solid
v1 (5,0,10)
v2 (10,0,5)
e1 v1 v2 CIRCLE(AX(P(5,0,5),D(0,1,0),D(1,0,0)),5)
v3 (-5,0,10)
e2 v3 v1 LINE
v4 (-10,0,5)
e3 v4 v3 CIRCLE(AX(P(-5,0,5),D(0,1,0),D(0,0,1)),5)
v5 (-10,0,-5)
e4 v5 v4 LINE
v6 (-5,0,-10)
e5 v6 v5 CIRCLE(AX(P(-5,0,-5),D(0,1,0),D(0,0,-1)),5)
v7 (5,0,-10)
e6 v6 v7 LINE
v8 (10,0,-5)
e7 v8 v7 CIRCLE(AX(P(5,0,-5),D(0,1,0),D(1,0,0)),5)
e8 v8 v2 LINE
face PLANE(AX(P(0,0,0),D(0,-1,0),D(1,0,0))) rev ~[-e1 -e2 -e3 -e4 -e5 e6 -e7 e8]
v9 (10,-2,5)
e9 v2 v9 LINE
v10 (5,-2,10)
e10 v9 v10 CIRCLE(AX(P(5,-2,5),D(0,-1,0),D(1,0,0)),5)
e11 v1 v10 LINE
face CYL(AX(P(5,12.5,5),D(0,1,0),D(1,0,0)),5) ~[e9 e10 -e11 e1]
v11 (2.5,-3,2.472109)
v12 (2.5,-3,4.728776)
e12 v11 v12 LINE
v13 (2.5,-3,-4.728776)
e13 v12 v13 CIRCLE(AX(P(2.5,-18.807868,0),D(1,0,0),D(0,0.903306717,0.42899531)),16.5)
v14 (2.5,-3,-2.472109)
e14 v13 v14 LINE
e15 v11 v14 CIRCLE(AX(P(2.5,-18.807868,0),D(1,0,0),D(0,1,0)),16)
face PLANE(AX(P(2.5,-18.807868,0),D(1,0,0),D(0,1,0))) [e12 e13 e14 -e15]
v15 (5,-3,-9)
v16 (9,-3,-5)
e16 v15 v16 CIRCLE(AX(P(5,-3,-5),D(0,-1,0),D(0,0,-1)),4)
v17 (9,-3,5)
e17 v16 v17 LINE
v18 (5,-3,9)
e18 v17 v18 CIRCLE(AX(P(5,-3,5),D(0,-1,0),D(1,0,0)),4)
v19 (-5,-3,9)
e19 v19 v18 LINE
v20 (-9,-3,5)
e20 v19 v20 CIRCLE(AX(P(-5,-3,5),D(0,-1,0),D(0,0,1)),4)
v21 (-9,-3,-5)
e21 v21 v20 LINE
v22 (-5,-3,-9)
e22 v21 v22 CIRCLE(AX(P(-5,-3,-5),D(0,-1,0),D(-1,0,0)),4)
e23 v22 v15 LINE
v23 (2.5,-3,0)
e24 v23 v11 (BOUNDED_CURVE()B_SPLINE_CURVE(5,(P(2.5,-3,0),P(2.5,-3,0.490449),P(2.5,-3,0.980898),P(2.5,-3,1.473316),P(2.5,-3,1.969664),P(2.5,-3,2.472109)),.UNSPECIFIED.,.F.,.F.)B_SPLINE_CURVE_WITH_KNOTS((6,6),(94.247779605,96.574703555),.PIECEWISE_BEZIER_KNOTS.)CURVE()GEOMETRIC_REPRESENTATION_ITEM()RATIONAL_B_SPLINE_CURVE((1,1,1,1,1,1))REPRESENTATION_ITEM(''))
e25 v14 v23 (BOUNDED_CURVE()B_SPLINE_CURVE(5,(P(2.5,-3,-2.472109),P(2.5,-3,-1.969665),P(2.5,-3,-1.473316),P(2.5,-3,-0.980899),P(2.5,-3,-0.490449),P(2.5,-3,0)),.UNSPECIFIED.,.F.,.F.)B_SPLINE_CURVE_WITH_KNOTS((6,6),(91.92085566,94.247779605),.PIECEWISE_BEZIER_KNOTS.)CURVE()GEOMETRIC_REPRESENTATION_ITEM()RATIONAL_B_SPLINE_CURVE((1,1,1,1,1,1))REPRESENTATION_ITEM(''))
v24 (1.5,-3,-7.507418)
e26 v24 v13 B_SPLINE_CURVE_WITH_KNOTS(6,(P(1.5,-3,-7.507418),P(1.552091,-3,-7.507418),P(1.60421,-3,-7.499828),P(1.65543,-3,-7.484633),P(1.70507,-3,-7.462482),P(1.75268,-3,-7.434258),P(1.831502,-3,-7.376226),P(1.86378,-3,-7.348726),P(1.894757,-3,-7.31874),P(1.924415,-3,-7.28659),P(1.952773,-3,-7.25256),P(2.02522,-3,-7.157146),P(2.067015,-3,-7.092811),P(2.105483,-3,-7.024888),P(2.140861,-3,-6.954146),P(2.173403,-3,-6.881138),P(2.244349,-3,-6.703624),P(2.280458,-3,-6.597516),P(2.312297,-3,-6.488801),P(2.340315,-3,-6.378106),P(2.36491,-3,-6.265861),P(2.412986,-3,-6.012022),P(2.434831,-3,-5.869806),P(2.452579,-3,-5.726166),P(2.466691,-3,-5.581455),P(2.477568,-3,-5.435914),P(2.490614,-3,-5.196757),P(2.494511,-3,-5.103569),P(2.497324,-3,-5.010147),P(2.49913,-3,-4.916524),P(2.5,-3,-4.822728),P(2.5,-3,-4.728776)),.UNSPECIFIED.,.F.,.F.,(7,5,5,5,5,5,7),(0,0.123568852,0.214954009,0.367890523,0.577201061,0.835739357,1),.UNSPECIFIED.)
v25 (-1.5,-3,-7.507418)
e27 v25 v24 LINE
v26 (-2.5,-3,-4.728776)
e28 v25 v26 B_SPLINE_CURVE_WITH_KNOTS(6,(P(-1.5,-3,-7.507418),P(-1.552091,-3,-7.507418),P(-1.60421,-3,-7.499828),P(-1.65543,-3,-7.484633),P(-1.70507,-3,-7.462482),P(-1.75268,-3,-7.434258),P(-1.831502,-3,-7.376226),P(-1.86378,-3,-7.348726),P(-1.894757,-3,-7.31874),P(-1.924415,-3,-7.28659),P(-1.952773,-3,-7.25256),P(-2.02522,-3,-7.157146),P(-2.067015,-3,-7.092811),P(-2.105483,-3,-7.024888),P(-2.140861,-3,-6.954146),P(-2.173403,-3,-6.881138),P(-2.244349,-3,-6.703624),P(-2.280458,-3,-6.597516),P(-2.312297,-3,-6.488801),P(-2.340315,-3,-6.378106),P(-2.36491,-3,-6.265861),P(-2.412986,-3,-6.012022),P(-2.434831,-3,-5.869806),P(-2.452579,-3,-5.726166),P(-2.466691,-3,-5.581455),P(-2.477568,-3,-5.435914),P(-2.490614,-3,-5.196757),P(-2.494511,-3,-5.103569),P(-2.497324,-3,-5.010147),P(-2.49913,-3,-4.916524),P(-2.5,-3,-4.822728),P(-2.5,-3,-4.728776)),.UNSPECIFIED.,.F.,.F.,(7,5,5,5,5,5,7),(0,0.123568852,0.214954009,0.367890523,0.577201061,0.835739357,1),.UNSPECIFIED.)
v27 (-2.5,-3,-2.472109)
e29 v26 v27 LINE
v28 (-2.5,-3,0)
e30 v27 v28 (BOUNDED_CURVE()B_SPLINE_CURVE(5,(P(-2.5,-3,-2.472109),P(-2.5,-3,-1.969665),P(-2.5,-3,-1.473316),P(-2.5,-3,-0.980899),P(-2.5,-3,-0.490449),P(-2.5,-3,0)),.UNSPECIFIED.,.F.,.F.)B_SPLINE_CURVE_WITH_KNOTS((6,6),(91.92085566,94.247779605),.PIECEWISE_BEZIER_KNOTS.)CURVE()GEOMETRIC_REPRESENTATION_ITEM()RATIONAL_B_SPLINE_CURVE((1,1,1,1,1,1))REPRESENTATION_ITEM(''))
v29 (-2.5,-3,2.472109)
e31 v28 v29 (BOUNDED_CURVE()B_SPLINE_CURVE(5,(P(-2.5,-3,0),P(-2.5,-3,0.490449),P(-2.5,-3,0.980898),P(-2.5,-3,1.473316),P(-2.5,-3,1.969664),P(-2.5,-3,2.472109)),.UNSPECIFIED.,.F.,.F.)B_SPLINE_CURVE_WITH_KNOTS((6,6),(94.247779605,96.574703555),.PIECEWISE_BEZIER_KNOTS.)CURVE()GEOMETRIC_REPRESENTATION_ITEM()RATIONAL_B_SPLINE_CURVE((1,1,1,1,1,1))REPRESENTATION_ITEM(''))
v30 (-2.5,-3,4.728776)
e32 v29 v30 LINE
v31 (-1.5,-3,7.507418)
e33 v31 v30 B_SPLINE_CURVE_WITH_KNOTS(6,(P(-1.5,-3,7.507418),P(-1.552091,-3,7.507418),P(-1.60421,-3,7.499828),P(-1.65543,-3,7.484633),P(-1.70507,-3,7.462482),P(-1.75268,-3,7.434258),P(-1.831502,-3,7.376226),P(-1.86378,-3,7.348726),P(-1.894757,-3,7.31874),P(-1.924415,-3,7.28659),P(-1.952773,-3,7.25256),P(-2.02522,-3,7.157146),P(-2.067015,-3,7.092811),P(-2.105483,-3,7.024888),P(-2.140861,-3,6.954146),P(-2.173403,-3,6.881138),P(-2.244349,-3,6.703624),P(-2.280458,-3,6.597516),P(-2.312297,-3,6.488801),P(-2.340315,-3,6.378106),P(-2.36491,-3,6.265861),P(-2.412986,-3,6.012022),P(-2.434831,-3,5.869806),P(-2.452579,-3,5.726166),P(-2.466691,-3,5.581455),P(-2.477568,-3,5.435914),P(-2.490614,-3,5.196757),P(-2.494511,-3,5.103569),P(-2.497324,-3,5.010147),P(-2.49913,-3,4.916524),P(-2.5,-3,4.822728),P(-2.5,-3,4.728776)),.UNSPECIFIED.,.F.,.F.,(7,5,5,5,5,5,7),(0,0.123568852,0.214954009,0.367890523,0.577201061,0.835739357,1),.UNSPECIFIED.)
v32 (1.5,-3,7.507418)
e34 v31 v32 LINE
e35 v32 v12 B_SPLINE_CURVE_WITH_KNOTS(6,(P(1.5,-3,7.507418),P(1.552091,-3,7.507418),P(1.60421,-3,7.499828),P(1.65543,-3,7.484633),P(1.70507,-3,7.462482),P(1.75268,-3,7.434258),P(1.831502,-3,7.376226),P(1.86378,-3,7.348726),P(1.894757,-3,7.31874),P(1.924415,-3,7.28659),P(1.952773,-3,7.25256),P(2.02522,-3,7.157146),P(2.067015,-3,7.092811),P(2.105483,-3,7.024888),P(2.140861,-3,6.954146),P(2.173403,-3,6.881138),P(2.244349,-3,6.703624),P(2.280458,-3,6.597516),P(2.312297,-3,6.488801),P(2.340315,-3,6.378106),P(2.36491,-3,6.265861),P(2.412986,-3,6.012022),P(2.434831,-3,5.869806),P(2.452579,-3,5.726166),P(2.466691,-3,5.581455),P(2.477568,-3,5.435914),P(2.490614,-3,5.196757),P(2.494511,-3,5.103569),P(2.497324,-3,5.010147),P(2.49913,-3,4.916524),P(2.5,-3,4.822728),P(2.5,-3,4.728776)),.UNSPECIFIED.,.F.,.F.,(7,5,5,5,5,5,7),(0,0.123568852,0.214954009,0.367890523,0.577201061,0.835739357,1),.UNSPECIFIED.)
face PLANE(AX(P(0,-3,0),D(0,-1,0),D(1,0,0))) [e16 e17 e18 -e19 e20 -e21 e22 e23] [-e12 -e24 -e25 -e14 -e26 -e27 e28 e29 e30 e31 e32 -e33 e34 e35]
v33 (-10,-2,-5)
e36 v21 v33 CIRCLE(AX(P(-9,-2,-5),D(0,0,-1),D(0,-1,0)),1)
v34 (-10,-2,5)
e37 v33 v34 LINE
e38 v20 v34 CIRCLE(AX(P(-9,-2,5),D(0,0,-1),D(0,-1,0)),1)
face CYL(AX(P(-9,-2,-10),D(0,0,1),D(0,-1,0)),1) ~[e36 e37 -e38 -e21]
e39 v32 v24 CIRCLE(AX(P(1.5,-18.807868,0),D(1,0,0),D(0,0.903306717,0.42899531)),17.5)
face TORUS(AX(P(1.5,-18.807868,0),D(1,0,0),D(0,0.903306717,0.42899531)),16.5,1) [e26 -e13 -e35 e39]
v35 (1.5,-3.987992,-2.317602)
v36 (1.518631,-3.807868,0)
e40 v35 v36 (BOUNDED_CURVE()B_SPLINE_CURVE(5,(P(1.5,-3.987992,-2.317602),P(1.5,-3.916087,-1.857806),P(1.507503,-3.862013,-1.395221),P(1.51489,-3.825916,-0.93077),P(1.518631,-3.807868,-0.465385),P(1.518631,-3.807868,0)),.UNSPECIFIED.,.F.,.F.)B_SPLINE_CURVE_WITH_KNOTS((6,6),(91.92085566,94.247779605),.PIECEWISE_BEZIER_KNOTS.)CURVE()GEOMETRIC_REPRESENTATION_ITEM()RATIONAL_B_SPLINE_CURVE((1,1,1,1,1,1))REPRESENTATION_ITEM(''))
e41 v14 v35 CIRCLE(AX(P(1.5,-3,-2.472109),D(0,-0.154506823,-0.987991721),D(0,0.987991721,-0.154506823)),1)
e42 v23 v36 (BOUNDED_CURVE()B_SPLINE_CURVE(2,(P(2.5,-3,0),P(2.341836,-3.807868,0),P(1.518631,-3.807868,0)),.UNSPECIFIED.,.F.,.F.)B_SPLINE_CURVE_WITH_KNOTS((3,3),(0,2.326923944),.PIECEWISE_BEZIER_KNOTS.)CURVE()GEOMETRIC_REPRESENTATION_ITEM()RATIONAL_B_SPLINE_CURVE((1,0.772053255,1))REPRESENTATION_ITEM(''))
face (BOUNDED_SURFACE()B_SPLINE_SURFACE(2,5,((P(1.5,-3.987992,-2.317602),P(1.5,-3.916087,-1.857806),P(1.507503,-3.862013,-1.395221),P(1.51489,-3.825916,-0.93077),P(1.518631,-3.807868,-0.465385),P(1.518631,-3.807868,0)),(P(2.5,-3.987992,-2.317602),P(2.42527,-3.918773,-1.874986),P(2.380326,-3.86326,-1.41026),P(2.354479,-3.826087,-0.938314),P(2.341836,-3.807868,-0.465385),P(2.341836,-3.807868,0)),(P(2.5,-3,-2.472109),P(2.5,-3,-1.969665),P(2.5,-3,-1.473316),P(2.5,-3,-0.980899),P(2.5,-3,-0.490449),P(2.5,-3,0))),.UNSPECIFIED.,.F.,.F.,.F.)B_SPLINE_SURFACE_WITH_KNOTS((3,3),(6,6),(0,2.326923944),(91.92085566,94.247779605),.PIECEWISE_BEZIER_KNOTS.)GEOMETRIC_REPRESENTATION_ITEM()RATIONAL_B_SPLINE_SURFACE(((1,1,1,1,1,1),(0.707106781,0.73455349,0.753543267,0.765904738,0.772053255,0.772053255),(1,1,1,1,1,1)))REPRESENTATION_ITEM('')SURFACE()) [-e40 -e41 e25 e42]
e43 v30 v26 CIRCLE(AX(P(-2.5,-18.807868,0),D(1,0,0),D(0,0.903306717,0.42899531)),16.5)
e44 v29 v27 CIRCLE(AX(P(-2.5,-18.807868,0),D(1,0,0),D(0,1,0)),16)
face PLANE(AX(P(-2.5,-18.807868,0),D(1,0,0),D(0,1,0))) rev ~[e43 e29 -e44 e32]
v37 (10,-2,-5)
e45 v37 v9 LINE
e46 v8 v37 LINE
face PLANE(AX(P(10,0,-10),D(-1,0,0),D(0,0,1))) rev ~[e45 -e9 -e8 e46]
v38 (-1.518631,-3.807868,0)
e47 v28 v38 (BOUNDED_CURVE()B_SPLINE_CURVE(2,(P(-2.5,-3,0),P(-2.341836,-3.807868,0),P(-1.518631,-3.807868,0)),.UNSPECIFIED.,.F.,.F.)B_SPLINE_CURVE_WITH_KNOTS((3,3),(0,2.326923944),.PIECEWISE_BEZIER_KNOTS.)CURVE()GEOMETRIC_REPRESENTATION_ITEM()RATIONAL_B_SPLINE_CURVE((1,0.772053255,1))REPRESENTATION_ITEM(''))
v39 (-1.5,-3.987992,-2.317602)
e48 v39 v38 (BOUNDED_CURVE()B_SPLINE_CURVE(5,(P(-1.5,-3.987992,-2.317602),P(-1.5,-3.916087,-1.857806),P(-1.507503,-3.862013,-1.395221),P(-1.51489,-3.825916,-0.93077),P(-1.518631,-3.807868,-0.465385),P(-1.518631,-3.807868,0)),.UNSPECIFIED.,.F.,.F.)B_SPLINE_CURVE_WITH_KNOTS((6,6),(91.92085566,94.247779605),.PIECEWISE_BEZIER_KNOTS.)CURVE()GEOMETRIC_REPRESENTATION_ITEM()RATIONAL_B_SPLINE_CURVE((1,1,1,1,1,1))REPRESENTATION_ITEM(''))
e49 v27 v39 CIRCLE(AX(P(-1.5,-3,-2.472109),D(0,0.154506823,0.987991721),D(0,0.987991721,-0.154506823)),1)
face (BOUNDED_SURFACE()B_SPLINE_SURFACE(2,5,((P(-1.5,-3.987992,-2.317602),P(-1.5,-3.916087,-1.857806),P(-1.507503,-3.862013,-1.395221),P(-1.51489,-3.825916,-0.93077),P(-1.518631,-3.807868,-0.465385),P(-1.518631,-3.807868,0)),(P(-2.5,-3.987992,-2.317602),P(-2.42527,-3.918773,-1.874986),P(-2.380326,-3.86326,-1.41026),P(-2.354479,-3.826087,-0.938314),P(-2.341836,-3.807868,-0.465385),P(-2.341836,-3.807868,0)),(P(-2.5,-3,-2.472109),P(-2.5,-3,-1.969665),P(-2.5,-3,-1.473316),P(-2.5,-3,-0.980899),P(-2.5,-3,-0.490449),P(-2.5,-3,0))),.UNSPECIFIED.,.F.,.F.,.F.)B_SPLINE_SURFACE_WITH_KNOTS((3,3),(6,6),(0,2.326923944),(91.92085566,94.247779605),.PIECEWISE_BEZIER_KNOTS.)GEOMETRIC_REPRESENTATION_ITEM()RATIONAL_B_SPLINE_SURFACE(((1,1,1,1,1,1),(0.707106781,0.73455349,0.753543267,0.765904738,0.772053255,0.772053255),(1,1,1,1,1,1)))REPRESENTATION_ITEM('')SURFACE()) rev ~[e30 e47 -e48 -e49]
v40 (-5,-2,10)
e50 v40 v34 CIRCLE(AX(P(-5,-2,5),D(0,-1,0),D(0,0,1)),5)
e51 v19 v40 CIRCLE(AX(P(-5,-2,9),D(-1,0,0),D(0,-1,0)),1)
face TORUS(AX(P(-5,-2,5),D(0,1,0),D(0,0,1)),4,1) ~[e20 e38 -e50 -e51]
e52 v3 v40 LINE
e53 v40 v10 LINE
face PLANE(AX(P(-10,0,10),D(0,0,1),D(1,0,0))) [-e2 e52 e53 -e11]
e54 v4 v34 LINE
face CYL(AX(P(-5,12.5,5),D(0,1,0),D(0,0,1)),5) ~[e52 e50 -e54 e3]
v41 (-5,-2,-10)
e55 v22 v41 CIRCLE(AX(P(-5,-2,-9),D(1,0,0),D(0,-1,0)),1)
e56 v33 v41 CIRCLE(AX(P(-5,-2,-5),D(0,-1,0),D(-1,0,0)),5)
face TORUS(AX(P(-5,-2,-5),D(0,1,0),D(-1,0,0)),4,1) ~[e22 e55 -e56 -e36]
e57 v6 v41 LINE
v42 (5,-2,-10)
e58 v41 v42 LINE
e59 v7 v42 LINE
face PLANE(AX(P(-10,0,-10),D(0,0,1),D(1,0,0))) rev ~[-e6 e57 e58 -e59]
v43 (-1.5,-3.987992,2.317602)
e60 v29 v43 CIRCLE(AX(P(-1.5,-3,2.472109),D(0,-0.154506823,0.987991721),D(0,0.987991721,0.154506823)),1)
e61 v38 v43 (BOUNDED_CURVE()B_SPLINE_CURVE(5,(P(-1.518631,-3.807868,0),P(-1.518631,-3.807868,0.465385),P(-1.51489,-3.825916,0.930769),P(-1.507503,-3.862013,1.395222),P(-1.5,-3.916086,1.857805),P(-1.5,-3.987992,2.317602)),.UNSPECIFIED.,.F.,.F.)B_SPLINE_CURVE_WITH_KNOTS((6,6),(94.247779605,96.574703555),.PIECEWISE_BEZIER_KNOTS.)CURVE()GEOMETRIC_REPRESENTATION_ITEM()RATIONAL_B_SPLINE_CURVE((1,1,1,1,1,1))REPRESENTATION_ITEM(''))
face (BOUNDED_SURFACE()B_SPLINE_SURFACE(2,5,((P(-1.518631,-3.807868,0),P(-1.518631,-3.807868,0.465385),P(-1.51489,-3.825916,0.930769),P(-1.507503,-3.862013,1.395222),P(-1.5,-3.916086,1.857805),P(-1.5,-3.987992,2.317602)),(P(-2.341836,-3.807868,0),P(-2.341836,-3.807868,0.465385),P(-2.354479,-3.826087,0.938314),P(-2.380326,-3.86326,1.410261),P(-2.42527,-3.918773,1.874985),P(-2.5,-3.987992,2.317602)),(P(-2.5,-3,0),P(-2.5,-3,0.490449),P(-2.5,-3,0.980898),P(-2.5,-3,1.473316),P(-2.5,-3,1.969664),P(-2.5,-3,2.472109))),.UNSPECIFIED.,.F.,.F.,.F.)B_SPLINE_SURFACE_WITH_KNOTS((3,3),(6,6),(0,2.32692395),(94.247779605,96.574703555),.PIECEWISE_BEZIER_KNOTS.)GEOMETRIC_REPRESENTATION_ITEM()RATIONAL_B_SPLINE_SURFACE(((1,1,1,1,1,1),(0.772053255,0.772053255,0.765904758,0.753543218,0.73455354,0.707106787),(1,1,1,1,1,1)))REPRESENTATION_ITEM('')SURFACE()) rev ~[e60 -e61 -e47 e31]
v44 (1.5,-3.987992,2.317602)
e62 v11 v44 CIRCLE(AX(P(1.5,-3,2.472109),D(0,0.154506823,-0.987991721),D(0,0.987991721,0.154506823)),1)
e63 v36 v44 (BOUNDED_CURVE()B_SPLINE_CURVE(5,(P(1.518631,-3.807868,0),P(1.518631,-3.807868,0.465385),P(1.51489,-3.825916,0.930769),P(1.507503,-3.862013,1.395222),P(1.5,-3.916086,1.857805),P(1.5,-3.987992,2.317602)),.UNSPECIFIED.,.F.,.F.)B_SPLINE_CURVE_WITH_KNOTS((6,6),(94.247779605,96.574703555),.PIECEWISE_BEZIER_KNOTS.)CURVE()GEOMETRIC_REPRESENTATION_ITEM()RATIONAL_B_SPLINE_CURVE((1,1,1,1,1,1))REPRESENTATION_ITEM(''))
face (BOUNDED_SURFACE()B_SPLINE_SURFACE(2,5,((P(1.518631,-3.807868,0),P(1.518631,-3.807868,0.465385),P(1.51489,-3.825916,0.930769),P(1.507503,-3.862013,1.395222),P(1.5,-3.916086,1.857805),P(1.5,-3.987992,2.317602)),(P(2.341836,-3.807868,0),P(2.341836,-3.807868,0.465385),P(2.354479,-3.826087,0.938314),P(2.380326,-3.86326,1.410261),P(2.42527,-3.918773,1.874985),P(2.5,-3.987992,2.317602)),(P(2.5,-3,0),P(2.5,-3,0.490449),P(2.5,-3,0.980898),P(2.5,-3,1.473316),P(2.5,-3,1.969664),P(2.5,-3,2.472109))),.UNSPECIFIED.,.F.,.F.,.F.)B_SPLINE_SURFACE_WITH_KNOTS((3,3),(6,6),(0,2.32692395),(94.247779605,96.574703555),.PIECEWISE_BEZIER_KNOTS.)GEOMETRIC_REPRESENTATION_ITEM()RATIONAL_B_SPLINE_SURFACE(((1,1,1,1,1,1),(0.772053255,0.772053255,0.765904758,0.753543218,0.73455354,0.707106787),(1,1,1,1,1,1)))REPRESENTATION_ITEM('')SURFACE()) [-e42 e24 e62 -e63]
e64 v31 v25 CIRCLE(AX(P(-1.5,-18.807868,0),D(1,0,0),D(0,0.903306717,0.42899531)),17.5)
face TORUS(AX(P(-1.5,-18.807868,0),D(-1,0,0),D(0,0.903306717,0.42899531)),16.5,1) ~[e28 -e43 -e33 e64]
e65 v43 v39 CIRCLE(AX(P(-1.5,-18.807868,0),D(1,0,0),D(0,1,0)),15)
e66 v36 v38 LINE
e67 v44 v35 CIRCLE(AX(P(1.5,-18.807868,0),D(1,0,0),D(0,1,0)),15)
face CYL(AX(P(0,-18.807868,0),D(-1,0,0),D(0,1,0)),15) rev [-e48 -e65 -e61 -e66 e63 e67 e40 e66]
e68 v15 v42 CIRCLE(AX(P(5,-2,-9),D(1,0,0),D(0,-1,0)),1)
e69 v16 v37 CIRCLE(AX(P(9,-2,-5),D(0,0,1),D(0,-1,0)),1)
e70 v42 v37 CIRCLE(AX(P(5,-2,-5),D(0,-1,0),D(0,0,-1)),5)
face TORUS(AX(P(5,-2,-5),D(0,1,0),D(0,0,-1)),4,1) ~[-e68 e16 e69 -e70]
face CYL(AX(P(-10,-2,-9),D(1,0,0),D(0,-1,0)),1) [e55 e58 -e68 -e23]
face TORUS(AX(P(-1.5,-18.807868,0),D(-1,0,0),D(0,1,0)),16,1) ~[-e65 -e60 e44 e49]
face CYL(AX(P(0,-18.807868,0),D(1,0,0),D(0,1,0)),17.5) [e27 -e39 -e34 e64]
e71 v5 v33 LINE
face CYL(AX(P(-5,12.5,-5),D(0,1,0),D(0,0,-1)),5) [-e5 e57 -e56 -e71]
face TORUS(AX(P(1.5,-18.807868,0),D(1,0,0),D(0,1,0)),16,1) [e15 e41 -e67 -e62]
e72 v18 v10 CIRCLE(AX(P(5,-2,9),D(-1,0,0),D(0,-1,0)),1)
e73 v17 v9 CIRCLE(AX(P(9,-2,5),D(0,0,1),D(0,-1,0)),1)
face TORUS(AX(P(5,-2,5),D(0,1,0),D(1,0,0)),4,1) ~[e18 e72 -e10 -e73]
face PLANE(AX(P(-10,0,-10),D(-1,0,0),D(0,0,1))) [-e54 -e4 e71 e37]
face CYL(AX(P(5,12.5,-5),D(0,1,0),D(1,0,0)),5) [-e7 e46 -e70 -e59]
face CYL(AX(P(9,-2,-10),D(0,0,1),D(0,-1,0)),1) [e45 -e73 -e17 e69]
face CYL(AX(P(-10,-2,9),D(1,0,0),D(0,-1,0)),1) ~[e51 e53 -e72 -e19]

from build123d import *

# Parameters (mm, degrees)
F0_W         = 20
F0_H         = 20
F1_DEPTH     = 3
F2_R         = 17.5
F2_R_2       = 15
F3_DEPTH     = 2.5
F4_R         = 1
F5_T1_DEPTH  = 15.5
F5_T4_ANGLE  = 90
F5_T6_ANGLE  = 90
F5_T8_ANGLE  = 90
F5_T10_ANGLE = 90


# Not quite as in the source:
# - a fillet or chamfer that OpenCascade refuses, or shapes differently, is made with other operations: its cross-section is extruded or revolved along the edge and cut away or added


with BuildPart() as f1:
    # F0 (on Front) → F1 (new body)
    with BuildSketch(Plane.XZ):
        Rectangle(F0_W, F0_H)
    extrude(amount=F1_DEPTH)

    # F2 (on Right) → F3 (join, symmetric)
    with BuildSketch(Plane.YZ):
        with Locations((-18.8078675419, 0)):
            Circle(F2_R)
        with Locations((-18.8078675419, 0)):
            Circle(F2_R_2, mode=Mode.SUBTRACT)
    extrude(amount=F3_DEPTH, both=True)

    # F4 (call 1 of 5: OpenCascade refuses the feature's edges together)
    f4_edges = [f1.edges().sort_by_distance(p)[0] for p in [
        (2.5, -36.307868, 0),
    ]]
    fillet(f4_edges, radius=F4_R)

    # F4#2 (call 2 of 5)
    f4_2_edges = [f1.edges().sort_by_distance(p)[0] for p in [
        (-2.5, -36.307868, 0),
    ]]
    fillet(f4_2_edges, radius=F4_R)

    # F4#3 (call 3 of 5)
    f4_3_edges = [f1.edges().sort_by_distance(p)[0] for p in [
        (-2.5, -33.807868, 0),
    ]]
    fillet(f4_3_edges, radius=F4_R)

    # F4#4 (call 4 of 5)
    f4_4_edges = [f1.edges().sort_by_distance(p)[0] for p in [
        (2.5, -33.807868, 0),
    ]]
    fillet(f4_4_edges, radius=F4_R)

    # F4#5 (call 5 of 5)
    f4_5_edges = [f1.edges().sort_by_distance(p)[0] for p in [
        (10, -3, 0),
        (0, -3, 10),
        (-10, -3, 0),
        (0, -3, -10),
    ]]
    fillet(f4_5_edges, radius=F4_R)

    # F5: fillet of radius 5 on 4 edges, made by hand

    # F5_s2 → F5_t1 (cut)
    with BuildSketch(Plane.XZ.offset(-12.5)):
        with BuildLine():
            ThreePointArc((-5, 10), (-8.5355339059, 8.5355339059), (-10, 5))
            Line((-10, 5), (-10, 10))
            Line((-10, 10), (-5, 10))
        make_face()
        with BuildLine():
            ThreePointArc((-5, -10), (-8.5355339059, -8.5355339059), (-10, -5))
            Line((-10, -5), (-10, -10))
            Line((-10, -10), (-5, -10))
        make_face()
        with BuildLine():
            ThreePointArc((10, 5), (8.5355339059, 8.5355339059), (5, 10))
            Line((5, 10), (10, 10))
            Line((10, 10), (10, 5))
        make_face()
        with BuildLine():
            ThreePointArc((10, -5), (8.5355339059, -8.5355339059), (5, -10))
            Line((5, -10), (10, -10))
            Line((10, -10), (10, -5))
        make_face()
    extrude(amount=F5_T1_DEPTH, mode=Mode.SUBTRACT)

    # F5_s3 → F5_t4 (revolve, cut)
    with BuildSketch(Plane.YZ.offset(5)):
        with BuildLine():
            ThreePointArc((-3, -9), (-2.7071067812, -9.7071067812), (-2, -10))
            Line((-2, -10), (-3, -10))
            Line((-3, -10), (-3, -9))
        make_face()
    revolve(axis=Axis((5, -3, -5), (0, -1, 0)), revolution_arc=F5_T4_ANGLE, mode=Mode.SUBTRACT)

    # F5_s5 → F5_t6 (revolve, cut)
    with BuildSketch(Plane.XY.offset(5)):
        with BuildLine():
            ThreePointArc((9, -3), (9.7071067812, -2.7071067812), (10, -2))
            Line((10, -2), (10, -3))
            Line((10, -3), (9, -3))
        make_face()
    revolve(axis=Axis((5, -3, 5), (0, -1, 0)), revolution_arc=F5_T6_ANGLE, mode=Mode.SUBTRACT)

    # F5_s7 → F5_t8 (revolve, cut)
    with BuildSketch(Plane.XY.offset(-5)):
        with BuildLine():
            ThreePointArc((-9, -3), (-9.7071067812, -2.7071067812), (-10, -2))
            Line((-10, -2), (-10, -3))
            Line((-10, -3), (-9, -3))
        make_face()
    revolve(axis=Axis((-5, -3, -5), (0, -1, 0)), revolution_arc=F5_T8_ANGLE, mode=Mode.SUBTRACT)

    # F5_s9 → F5_t10 (revolve, cut)
    with BuildSketch(Plane.YZ.offset(-5)):
        with BuildLine():
            ThreePointArc((-3, 9), (-2.7071067812, 9.7071067812), (-2, 10))
            Line((-2, 10), (-3, 10))
            Line((-3, 10), (-3, 9))
        make_face()
    revolve(axis=Axis((-5, -3, 5), (0, -1, 0)), revolution_arc=F5_T10_ANGLE, mode=Mode.SUBTRACT)


solid = f1.part
